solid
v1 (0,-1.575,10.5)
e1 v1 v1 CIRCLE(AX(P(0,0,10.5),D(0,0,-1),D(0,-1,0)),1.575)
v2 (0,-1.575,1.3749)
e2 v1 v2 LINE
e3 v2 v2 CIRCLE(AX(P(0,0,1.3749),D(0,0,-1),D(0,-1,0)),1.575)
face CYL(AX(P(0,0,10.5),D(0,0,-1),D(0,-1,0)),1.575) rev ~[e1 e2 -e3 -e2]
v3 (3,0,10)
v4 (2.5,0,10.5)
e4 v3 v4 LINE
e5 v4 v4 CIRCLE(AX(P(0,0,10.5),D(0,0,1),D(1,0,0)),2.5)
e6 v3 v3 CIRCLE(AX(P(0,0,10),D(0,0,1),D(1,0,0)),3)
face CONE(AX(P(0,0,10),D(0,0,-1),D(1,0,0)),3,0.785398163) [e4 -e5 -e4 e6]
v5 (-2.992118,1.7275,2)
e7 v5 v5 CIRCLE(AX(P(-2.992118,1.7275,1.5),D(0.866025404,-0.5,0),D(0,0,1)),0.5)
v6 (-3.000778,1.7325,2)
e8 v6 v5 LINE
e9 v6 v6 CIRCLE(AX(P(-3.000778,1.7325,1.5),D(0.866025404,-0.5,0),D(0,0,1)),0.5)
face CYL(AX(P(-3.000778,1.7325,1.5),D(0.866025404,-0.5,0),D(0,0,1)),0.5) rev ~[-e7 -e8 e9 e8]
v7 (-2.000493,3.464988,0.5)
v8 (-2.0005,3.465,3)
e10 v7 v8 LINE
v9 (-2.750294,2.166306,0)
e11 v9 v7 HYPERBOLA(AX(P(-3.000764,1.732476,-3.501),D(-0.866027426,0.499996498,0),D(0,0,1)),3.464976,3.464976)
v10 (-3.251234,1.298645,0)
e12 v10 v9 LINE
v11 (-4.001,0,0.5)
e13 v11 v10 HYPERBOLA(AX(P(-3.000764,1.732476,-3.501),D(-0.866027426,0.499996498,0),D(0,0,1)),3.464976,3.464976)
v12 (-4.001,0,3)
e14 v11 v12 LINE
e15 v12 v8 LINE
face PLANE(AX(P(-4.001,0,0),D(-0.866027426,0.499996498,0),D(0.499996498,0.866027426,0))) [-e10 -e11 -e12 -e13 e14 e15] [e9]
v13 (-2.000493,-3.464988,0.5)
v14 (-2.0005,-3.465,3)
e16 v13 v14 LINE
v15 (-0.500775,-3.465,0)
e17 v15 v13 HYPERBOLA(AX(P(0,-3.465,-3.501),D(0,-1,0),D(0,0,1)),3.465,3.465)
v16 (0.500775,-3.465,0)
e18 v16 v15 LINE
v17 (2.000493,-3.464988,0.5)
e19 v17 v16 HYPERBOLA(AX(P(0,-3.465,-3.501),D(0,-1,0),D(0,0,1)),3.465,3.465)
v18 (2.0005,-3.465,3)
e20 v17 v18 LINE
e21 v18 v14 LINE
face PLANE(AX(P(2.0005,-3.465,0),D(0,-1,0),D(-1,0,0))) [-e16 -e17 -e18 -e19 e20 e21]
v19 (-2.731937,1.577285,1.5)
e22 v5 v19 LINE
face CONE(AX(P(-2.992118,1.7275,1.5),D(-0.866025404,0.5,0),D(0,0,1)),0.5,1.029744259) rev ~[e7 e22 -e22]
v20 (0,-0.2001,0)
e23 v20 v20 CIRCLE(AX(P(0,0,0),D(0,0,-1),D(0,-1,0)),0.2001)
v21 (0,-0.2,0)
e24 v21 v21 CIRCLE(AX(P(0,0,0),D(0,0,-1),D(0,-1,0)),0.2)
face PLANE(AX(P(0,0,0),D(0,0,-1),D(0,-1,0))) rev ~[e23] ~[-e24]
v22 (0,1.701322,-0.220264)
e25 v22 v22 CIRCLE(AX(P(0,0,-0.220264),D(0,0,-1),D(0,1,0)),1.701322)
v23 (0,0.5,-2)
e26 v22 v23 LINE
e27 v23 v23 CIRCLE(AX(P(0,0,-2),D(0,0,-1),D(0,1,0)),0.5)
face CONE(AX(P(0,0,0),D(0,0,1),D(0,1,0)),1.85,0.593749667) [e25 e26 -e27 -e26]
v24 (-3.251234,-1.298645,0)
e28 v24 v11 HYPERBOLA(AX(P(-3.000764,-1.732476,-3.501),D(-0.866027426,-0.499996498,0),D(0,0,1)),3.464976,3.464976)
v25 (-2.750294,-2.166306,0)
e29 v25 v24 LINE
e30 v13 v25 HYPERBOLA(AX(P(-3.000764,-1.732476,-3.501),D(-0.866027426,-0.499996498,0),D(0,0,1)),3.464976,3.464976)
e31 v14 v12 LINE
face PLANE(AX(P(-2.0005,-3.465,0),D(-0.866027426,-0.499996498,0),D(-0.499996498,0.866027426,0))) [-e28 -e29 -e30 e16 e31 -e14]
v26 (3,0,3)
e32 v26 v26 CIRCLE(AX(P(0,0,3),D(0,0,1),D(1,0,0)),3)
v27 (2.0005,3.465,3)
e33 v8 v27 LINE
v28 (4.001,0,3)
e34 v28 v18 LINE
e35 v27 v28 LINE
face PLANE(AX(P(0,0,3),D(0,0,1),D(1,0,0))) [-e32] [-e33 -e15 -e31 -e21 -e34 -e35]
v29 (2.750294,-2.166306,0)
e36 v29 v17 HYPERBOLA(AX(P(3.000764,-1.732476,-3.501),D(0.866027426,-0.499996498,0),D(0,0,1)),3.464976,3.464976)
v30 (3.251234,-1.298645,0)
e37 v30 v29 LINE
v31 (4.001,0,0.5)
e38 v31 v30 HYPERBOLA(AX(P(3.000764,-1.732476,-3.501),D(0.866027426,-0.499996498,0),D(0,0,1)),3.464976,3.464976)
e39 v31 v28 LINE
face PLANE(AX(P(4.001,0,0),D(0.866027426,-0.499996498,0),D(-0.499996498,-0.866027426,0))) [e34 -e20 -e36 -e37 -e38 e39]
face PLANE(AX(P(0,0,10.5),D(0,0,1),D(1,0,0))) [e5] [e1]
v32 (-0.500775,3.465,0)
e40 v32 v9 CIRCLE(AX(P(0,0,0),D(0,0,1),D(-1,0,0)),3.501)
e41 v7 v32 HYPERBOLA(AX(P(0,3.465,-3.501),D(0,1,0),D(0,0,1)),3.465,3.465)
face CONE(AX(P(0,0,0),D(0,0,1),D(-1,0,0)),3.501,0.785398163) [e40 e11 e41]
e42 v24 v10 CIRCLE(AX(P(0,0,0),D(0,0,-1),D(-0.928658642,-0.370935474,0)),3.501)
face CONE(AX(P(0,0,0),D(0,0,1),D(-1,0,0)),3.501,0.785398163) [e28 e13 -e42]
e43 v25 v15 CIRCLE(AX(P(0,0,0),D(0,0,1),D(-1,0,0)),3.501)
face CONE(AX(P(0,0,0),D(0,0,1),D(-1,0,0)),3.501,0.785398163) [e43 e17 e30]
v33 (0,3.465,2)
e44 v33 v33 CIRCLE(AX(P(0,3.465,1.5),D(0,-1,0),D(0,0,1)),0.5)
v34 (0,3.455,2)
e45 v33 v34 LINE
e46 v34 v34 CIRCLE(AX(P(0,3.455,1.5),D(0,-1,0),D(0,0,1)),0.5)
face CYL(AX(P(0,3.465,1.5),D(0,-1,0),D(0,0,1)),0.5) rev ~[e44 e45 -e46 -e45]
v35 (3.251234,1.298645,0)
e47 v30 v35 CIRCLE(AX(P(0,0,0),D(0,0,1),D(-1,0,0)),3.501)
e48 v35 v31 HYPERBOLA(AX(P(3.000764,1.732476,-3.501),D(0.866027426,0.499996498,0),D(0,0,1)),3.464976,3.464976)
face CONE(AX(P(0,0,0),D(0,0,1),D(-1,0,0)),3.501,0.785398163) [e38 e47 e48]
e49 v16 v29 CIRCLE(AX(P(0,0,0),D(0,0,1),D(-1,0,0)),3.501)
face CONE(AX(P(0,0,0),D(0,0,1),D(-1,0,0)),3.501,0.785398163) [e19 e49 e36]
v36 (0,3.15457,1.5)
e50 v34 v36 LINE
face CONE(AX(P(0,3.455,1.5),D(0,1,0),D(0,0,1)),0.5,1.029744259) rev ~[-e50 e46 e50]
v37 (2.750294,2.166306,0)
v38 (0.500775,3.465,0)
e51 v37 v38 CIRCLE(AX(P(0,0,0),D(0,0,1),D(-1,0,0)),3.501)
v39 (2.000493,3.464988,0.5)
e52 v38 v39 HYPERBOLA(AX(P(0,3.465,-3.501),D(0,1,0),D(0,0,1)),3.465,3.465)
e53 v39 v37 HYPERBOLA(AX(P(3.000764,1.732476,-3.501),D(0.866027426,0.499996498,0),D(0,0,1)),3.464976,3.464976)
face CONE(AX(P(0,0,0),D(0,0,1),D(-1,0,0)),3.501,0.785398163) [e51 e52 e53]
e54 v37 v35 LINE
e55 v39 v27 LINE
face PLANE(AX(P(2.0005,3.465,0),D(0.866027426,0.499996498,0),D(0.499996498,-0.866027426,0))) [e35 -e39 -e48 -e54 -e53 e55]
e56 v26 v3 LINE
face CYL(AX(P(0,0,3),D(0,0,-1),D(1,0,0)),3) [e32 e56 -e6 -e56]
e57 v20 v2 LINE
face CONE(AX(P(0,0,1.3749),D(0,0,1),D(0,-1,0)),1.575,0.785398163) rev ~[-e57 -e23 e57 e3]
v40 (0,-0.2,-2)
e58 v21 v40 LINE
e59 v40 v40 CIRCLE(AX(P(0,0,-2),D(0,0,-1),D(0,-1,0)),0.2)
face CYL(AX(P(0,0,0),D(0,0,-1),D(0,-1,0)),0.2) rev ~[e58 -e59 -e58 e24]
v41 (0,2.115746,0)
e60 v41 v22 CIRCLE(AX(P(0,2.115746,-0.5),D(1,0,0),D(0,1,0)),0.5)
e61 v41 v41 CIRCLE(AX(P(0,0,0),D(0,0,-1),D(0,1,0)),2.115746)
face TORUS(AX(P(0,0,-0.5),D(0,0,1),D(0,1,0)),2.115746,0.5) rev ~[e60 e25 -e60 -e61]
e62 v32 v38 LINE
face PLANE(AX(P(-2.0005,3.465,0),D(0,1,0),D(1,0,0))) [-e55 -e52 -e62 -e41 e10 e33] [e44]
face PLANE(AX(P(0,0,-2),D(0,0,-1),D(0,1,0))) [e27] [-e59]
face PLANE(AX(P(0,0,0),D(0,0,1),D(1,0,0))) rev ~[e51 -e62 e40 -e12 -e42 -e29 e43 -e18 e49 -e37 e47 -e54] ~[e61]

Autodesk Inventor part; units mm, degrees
ref_plane "YZ Plane" through (0, 0, 0) normal (1, 0, 0) x (0, 1, 0)
ref_plane "XZ Plane" through (0, 0, 0) normal (0, 1, 0) x (-1, 0, 0)
ref_plane "XY Plane" through (0, 0, 0) normal (0, 0, 1) x (1, 0, 0)
sketch "Esquisse1" plane through (0, 0, 0) normal (0, 0, 1) x (1, 0, 0)
  line L0 (2.0005, 3.465) -> (4.001, 0)
  line L1 (4.001, 0) -> (2.0005, -3.465)
  line L2 (2.0005, -3.465) -> (-2.0005, -3.465)
  line L3 (-2.0005, -3.465) -> (-4.001, 0)
  line L4 (-4.001, 0) -> (-2.0005, 3.465)
  line L5 (-2.0005, 3.465) -> (2.0005, 3.465)
  point P0 (0, 0)
  point P1 (0, 0)
  dimension "d0" = 6.93
extrude "Extrusion1" add sketch "Esquisse1" along normal blind 3
sketch "Esquisse2" plane through (0, 0, 3) normal (0, 0, 1) x (1, 0, 0)
  circle A0 centre (0, 0) radius 3
  dimension "d3" = 6
extrude "Extrusion2" add sketch "Esquisse2" along normal blind 7.5
sketch "Esquisse3" plane through (0, 0, 0) normal (1, 0, 0) x (0, 1, 0)
  line L0 (1.85, 0) -> (0.5, -2)
  line L1 (0.5, -2) -> (0, -2)
  line L2 (0, -2) -> (0, 0)
  line L3 (0, 0) -> (1.85, 0)
  line L4 (0, 0) -> (3.465, 0) construction
  line L5 (0, 0) -> (0, -9.9285)
  dimension "d6" = 2
  dimension "d7" = 1
  dimension "d8" = 3.7
revolve "Révolution1" add sketch "Esquisse3" angle 360 about axis through (0, 0, 0) along (0, 0, -1)
chamfer "Chanfrein1" distance 0.5 angle 45 1 edges at (-3, 0, 10.5)
thread "Filetage1" size "M6x1" class "6g" standard "ANSI Metric M Profile" full length
sketch "Esquisse4" plane through (0, 0, 0) normal (0, 1, 0) x (-1, 0, 0)
  line L0 (2.0005, 0) -> (4.001, 0) projected
  line L1 (3.501, 0) -> (4.001, 0.5)
  line L2 (4.001, 0.5) -> (4.001, 0)
  line L3 (4.001, 0) -> (3.501, 0)
  line L4 (0, 0) -> (0, 3.501)
  dimension "d15" = 0.5
  dimension "d16" = 0.5
revolve "Révolution2" cut sketch "Esquisse4" angle 360 about axis through (0, 0, 0) along (0, 0, 1)
fillet "Congé1" radius 0.5 1 edges at (0, -1.85, 0)
sketch "Esquisse5" plane through (0, 0, 10.5) normal (0, 0, 1) x (1, 0, 0)
  point P0 (0, 0)
  point P1 (0, 0)
hole "Perçage1" at (0, 0, 10.5) direction (0, 0, -1) diameter 0.4 end through all counterbore diameter 3.15 counterbore depth 10.5
sketch "Esquisse6" plane through (-2.0005, 3.465, 3) normal (0, 1, 0) x (1, 0, 0)
  line L0 (1.4995, 3) -> (2.5016, 3) construction
  line L1 (4.7508, 3) -> (2.5016, 3) construction
  line L2 (6.0016, 0) -> (4.001, 0) construction
  point P0 (2.0005, 3)
  point P1 (2.0005, 1.5)
  point P2 (4.001, 1.5)
  point P3 (2.0005, 3)
  dimension "d26" = 3
  dimension "d27" = 1.5
hole "Perçage2" at (0, 3.465, 1.5) direction (0, -1, 0) diameter 1 depth 0.01 tip angle 118
pattern_circular "Réseau circulaire1" count 2 over 60 about axis through (0, 0, -5.8801) along (0, 0, 1) of "Perçage2"
chamfer "Chanfrein2" distance 1.375 angle 45 1 edges at (0, 1.575, 0)
equation "\"d16\" = d15"
equation "\"d27\" = 0.5 * d26"
properties part number "Buse 04" material "Laiton, jaune doux"
